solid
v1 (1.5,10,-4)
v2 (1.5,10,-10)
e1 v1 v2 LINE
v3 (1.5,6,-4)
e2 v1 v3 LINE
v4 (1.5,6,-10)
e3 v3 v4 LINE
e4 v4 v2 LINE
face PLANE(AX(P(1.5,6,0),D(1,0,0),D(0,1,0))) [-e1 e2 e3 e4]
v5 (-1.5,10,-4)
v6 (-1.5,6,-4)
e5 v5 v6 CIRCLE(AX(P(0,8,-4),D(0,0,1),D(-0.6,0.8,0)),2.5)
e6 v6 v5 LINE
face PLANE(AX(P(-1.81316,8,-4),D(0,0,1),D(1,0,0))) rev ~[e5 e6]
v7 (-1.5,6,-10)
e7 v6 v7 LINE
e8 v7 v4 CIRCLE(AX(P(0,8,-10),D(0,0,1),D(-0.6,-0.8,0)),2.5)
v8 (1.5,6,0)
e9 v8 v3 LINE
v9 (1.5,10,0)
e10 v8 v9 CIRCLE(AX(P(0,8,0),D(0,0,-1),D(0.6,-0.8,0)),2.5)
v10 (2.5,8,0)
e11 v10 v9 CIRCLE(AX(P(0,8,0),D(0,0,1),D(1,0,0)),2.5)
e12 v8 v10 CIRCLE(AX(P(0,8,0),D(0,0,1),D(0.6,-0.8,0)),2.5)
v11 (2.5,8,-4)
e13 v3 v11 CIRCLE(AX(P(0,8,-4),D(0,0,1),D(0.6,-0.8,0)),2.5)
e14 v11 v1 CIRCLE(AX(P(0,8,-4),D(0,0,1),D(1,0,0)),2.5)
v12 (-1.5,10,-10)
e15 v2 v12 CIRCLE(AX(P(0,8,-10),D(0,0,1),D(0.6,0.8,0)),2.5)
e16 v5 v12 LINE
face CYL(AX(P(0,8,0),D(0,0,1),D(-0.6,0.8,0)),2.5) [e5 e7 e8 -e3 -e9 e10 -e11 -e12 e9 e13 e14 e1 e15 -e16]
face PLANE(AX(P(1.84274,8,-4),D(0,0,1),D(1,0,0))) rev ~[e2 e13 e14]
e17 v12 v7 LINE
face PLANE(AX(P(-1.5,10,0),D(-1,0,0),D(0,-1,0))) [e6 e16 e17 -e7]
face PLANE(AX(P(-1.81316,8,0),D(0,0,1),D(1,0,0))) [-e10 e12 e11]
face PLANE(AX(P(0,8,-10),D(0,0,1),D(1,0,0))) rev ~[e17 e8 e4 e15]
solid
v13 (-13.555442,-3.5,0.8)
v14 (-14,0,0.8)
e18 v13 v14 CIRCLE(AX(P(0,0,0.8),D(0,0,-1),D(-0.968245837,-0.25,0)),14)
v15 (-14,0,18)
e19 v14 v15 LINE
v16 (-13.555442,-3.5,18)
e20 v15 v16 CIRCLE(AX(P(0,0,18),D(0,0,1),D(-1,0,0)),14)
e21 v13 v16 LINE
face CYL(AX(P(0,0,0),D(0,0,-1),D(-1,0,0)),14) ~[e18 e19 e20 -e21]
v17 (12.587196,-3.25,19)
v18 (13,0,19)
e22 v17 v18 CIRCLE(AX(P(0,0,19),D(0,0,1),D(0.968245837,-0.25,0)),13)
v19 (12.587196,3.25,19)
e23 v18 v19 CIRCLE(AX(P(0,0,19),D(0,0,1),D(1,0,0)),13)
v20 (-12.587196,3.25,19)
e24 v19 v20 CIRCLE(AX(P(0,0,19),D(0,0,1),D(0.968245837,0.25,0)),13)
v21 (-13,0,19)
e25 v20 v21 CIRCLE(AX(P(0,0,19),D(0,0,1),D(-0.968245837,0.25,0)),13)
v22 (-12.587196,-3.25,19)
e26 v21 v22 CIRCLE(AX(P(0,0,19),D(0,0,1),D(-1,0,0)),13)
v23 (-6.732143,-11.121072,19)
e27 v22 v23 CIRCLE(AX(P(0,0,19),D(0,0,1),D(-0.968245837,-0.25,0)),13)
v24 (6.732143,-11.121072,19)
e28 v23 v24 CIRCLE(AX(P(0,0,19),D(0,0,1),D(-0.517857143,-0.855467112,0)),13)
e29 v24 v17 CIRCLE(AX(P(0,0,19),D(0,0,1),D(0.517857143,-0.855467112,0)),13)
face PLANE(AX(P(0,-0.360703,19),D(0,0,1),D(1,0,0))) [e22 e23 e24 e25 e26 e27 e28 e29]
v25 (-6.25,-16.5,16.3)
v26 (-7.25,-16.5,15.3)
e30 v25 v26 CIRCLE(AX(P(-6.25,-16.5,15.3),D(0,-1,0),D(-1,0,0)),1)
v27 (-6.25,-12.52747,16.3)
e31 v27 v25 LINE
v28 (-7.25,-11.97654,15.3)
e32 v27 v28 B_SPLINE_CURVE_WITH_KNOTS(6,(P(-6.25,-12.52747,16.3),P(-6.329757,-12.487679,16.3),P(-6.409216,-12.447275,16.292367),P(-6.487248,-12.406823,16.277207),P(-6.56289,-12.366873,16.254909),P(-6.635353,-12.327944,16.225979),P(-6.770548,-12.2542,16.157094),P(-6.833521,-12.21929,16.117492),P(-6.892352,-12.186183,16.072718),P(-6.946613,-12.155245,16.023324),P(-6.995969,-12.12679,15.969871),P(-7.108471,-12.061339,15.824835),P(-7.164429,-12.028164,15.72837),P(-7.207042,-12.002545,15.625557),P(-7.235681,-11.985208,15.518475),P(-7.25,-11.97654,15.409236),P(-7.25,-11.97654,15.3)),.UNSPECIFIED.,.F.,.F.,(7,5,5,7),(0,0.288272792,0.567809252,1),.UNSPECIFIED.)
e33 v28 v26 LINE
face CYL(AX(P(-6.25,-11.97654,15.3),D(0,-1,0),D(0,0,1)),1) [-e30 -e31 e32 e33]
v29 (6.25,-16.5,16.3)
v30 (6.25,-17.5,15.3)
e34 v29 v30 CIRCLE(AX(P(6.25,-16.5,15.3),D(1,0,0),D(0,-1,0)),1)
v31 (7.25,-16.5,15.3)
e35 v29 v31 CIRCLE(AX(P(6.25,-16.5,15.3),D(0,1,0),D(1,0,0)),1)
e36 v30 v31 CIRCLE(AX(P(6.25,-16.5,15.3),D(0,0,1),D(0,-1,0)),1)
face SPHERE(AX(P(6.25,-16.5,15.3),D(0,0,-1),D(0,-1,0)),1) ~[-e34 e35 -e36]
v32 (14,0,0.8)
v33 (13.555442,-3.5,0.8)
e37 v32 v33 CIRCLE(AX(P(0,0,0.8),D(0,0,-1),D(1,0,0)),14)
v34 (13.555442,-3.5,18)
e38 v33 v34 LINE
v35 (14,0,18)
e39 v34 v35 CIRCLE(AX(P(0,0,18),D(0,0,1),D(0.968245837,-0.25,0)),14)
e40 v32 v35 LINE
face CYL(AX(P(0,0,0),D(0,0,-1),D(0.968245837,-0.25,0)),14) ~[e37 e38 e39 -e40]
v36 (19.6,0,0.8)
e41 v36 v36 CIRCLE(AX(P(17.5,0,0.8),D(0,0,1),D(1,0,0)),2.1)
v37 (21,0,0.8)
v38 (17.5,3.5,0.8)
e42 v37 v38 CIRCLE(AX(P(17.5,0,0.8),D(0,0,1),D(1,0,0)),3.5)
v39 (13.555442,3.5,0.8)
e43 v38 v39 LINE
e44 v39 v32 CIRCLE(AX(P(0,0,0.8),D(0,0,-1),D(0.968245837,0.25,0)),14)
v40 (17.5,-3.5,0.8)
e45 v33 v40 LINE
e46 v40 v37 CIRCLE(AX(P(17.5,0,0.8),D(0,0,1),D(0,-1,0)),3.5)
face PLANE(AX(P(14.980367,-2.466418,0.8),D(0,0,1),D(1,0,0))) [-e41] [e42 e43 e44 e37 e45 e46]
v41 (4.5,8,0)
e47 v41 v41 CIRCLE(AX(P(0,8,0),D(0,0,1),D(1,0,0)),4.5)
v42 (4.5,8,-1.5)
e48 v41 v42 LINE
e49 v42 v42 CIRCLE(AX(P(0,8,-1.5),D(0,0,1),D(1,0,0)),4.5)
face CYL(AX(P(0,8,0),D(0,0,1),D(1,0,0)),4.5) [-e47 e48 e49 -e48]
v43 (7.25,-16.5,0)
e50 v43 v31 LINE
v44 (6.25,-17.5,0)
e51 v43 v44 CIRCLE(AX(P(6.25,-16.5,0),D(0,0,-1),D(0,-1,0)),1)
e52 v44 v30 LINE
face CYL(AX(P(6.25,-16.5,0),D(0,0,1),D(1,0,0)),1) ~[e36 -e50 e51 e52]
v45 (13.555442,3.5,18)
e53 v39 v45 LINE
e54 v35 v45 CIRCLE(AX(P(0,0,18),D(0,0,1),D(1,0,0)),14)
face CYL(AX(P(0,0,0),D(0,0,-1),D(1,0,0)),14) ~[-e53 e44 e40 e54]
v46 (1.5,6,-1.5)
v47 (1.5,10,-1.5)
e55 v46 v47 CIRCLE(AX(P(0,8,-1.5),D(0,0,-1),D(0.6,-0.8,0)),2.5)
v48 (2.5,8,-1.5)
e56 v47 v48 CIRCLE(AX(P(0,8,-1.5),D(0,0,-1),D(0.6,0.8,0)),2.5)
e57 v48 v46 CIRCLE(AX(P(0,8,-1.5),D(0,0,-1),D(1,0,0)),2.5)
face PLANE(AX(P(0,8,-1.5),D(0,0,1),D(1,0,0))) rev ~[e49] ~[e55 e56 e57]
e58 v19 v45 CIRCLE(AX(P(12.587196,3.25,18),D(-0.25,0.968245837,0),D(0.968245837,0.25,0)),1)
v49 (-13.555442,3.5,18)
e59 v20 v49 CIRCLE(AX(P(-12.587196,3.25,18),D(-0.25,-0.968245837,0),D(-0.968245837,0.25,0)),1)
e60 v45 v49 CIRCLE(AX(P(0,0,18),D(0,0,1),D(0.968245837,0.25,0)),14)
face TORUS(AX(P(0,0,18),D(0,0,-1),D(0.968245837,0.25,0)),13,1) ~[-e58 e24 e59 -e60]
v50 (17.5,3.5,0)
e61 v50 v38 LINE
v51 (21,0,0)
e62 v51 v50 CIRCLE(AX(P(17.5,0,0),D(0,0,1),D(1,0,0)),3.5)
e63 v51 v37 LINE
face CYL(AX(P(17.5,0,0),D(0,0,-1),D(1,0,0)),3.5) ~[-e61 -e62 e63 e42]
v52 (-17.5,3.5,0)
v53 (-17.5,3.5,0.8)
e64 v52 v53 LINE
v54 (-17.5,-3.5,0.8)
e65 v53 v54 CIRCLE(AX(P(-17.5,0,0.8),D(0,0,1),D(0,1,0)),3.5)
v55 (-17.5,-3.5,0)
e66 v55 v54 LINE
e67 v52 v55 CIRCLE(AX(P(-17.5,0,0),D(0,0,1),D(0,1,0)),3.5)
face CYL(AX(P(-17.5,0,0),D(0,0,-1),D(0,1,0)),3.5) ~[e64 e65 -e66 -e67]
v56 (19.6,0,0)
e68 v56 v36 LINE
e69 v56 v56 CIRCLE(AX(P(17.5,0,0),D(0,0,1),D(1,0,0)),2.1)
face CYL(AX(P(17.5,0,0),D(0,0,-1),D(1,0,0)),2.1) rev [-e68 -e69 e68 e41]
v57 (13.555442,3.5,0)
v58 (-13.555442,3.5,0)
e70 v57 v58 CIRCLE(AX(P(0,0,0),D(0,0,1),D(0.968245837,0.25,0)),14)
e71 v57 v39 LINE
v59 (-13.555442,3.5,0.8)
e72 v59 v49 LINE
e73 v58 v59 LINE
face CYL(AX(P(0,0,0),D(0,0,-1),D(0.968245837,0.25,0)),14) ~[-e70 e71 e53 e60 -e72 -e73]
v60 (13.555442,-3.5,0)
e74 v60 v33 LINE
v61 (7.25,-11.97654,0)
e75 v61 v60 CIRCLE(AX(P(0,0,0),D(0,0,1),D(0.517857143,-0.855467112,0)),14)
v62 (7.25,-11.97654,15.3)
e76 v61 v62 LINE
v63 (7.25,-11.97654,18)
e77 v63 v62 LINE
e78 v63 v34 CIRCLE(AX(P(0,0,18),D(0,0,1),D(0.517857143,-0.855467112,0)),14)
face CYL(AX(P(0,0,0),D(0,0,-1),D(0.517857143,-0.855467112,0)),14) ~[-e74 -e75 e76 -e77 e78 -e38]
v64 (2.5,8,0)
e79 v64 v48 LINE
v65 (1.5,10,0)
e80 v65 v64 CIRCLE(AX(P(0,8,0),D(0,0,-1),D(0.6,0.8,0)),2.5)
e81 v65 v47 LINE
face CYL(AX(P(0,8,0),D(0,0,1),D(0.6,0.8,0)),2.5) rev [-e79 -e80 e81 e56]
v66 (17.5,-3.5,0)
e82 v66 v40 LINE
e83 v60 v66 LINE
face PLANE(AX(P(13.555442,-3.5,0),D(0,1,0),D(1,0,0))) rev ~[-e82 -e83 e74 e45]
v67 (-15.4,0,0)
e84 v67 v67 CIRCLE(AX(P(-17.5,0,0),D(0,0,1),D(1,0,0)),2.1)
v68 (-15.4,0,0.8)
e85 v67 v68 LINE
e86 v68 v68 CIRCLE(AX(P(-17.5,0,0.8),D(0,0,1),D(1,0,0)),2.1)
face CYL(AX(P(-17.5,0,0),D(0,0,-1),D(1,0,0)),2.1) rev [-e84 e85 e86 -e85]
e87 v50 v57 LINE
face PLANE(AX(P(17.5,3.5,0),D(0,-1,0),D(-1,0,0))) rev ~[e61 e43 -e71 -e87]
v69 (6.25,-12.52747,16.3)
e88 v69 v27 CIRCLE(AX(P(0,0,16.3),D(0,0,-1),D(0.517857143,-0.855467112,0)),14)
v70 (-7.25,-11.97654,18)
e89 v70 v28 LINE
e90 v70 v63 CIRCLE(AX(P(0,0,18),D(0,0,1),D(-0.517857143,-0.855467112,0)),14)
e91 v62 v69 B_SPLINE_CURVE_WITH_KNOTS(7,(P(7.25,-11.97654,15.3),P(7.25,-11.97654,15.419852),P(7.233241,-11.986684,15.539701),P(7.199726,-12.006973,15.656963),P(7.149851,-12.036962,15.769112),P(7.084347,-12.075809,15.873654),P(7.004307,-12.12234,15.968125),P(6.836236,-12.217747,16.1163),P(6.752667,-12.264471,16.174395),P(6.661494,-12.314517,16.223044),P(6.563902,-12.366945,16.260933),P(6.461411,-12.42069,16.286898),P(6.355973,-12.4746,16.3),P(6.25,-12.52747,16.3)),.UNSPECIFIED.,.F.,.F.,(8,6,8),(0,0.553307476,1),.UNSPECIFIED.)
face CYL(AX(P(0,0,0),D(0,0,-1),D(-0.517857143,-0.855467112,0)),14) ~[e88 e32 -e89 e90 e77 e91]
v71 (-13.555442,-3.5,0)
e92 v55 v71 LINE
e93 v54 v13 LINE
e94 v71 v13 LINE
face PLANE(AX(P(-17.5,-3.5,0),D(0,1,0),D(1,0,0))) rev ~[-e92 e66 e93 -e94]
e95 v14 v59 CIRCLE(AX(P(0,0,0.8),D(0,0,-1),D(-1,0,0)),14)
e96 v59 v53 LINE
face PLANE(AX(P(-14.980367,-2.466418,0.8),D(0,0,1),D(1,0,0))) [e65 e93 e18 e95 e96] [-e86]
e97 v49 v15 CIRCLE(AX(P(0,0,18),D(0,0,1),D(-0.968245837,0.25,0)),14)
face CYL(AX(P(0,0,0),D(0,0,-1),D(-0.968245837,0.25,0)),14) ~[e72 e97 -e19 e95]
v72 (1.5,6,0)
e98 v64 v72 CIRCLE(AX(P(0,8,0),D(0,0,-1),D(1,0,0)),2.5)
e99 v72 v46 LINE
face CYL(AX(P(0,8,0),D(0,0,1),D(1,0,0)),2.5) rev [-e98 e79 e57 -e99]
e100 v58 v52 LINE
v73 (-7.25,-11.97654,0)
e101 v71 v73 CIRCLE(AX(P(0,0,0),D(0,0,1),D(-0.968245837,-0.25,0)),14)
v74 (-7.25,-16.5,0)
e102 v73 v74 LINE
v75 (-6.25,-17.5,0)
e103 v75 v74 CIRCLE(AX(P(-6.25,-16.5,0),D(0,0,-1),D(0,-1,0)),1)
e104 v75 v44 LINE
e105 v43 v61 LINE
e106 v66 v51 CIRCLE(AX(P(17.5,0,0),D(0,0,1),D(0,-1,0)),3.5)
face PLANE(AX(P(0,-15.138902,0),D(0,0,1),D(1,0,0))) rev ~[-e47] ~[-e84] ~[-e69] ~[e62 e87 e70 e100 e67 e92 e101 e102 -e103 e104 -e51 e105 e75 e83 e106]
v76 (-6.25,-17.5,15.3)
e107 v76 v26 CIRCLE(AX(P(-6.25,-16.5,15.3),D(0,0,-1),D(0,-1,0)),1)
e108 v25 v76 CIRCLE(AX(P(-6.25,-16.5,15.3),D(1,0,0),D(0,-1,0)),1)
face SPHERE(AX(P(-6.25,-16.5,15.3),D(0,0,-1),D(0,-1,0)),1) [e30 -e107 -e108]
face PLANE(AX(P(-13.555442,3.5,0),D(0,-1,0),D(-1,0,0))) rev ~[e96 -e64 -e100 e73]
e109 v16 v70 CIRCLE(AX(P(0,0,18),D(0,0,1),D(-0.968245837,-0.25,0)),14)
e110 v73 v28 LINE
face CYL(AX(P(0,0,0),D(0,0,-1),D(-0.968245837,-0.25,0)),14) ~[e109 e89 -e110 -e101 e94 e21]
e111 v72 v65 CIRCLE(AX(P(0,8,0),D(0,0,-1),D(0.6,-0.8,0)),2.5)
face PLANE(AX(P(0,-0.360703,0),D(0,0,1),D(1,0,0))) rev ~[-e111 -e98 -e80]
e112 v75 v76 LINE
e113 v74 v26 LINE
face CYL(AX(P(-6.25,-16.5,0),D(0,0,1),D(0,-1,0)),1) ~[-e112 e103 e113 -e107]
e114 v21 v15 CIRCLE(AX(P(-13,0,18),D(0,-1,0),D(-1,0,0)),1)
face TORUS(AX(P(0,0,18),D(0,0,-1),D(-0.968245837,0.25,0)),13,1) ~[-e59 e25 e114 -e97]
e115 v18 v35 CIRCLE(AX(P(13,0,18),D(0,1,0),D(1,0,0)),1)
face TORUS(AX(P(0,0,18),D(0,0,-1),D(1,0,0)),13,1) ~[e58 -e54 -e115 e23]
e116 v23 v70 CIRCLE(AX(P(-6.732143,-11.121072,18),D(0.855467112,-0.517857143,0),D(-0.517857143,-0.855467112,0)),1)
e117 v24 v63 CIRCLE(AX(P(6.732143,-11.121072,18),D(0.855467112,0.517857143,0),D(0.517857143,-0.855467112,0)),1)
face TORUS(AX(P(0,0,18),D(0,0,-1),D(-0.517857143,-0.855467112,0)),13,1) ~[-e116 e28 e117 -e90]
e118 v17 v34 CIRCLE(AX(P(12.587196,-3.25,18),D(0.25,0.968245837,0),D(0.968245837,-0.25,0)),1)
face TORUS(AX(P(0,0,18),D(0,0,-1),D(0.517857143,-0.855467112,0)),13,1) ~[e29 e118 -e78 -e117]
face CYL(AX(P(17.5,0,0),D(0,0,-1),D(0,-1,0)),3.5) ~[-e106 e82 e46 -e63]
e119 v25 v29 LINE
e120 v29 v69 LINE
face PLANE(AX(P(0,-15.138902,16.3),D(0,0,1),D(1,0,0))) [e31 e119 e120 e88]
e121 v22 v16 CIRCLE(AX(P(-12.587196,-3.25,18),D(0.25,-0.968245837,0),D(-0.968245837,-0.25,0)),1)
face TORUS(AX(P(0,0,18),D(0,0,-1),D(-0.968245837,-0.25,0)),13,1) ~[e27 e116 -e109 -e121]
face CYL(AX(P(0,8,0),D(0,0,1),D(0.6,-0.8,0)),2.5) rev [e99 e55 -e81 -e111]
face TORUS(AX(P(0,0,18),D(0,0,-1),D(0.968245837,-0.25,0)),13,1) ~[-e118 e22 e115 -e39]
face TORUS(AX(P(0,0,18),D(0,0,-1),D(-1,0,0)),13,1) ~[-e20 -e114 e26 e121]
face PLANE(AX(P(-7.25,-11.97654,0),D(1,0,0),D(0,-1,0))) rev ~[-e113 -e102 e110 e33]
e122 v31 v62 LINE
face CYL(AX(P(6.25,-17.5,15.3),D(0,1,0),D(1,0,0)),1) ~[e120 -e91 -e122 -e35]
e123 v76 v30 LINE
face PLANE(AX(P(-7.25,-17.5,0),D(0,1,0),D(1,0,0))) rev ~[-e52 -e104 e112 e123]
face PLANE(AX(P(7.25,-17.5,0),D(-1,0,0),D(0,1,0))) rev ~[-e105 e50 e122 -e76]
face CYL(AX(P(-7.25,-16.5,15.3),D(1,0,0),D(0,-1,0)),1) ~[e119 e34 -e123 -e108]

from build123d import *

# Parameters (mm, degrees)
F0_R     = 4.5
F1_DEPTH = 19
F2_DEPTH = 10
F3_DEPTH = 1.5
F0_R_2   = 2.1
F4_DEPTH = 0.8
F5_DEPTH = 16.3
F6_R     = 1
F7_DEPTH = 4


with BuildPart() as f1:
    # F0 (on Top) → F1 (new body)
    with BuildSketch(Plane.XY):
        with BuildLine():
            ThreePointArc((13.5554417117, -3.5), (13.8884157477, -1.7640600948), (14, 0))
            ThreePointArc((14, 0), (13.8884157477, 1.7640600948), (13.5554417117, 3.5))
            ThreePointArc((13.5554417117, 3.5), (0, 14), (-13.5554417117, 3.5))
            ThreePointArc((-13.5554417117, 3.5), (-13.8884157477, 1.7640600948), (-14, 0))
            ThreePointArc((-14, 0), (-13.8884157477, -1.7640600948), (-13.5554417117, -3.5))
            ThreePointArc((-13.5554417117, -3.5), (-11.2329663029, -8.3558642903), (-7.25, -11.976539567))
            ThreePointArc((-7.25, -11.976539567), (0, -14), (7.25, -11.976539567))
            ThreePointArc((7.25, -11.976539567), (11.2329663029, -8.3558642903), (13.5554417117, -3.5))
        make_face()
        with Locations((0, 8)):
            Circle(F0_R, mode=Mode.SUBTRACT)
        with Locations((0, 8)):
            Circle(F0_R)
        with BuildLine():
            ThreePointArc((1.5, 10), (2.2360679775, 9.1180339887), (2.5, 8))
            ThreePointArc((2.5, 8), (2.2360679775, 6.8819660113), (1.5, 6))
            ThreePointArc((1.5, 6), (0, 5.5), (-1.5, 6))
            ThreePointArc((-1.5, 6), (-2.5, 8), (-1.5, 10))
            ThreePointArc((-1.5, 10), (0, 10.5), (1.5, 10))
        make_face(mode=Mode.SUBTRACT)
        with BuildLine():
            Line((1.5, 6), (1.5, 10))
            ThreePointArc((1.5, 10), (0, 10.5), (-1.5, 10))
            Line((-1.5, 10), (-1.5, 6))
            ThreePointArc((-1.5, 6), (0, 5.5), (1.5, 6))
        make_face()
        with BuildLine():
            ThreePointArc((1.5, 6), (2.2360679775, 6.8819660113), (2.5, 8))
            ThreePointArc((2.5, 8), (2.2360679775, 9.1180339887), (1.5, 10))
            Line((1.5, 10), (1.5, 6))
        make_face()
        with BuildLine():
            Line((-1.5, 6), (-1.5, 10))
            ThreePointArc((-1.5, 10), (-2.5, 8), (-1.5, 6))
        make_face()
    extrude(amount=F1_DEPTH)

    # F0 (on Top) → F3 (join)
    with BuildSketch(Plane.XY):
        with Locations((0, 8)):
            Circle(F0_R)
        with BuildLine():
            ThreePointArc((1.5, 10), (2.2360679775, 9.1180339887), (2.5, 8))
            ThreePointArc((2.5, 8), (2.2360679775, 6.8819660113), (1.5, 6))
            ThreePointArc((1.5, 6), (0, 5.5), (-1.5, 6))
            ThreePointArc((-1.5, 6), (-2.5, 8), (-1.5, 10))
            ThreePointArc((-1.5, 10), (0, 10.5), (1.5, 10))
        make_face(mode=Mode.SUBTRACT)
    extrude(amount=-F3_DEPTH)

    # F0 (on Top) → F4 (join)
    with BuildSketch(Plane.XY):
        with BuildLine():
            ThreePointArc((17.5, -3.5), (15.0251262658, -2.4748737342), (14, 0))
            ThreePointArc((14, 0), (13.8884157477, -1.7640600948), (13.5554417117, -3.5))
            Line((13.5554417117, -3.5), (17.5, -3.5))
        make_face()
        with BuildLine():
            ThreePointArc((17.5, 3.5), (15.0251262658, 2.4748737342), (14, 0))
            ThreePointArc((14, 0), (15.0251262658, -2.4748737342), (17.5, -3.5))
            ThreePointArc((17.5, -3.5), (19.9748737342, -2.4748737342), (21, 0))
            ThreePointArc((21, 0), (19.9748737342, 2.4748737342), (17.5, 3.5))
        make_face()
        with Locations((17.5, 0)):
            Circle(F0_R_2, mode=Mode.SUBTRACT)
        with BuildLine():
            ThreePointArc((13.5554417117, 3.5), (13.8884157477, 1.7640600948), (14, 0))
            ThreePointArc((14, 0), (15.0251262658, 2.4748737342), (17.5, 3.5))
            Line((17.5, 3.5), (13.5554417117, 3.5))
        make_face()
        with BuildLine():
            ThreePointArc((-13.5554417117, -3.5), (-13.8884157477, -1.7640600948), (-14, 0))
            ThreePointArc((-14, 0), (-15.0251262658, -2.4748737342), (-17.5, -3.5))
            Line((-17.5, -3.5), (-13.5554417117, -3.5))
        make_face()
        with BuildLine():
            ThreePointArc((-17.5, -3.5), (-15.0251262658, -2.4748737342), (-14, 0))
            ThreePointArc((-14, 0), (-15.0251262658, 2.4748737342), (-17.5, 3.5))
            ThreePointArc((-17.5, 3.5), (-21, 0), (-17.5, -3.5))
        make_face()
        with Locations((-17.5, 0)):
            Circle(F0_R_2, mode=Mode.SUBTRACT)
        with BuildLine():
            ThreePointArc((-14, 0), (-13.8884157477, 1.7640600948), (-13.5554417117, 3.5))
            Line((-13.5554417117, 3.5), (-17.5, 3.5))
            ThreePointArc((-17.5, 3.5), (-15.0251262658, 2.4748737342), (-14, 0))
        make_face()
    extrude(amount=F4_DEPTH)

    # F0 (on Top) → F5 (join, through all)
    with BuildSketch(Plane.XY):
        with BuildLine():
            Line((7.25, -17.5), (7.25, -11.976539567))
            ThreePointArc((7.25, -11.976539567), (0, -14), (-7.25, -11.976539567))
            Line((-7.25, -11.976539567), (-7.25, -17.5))
            Line((-7.25, -17.5), (7.25, -17.5))
        make_face()
    extrude(amount=F5_DEPTH)

    # F6
    f6_edges = [f1.edges().sort_by_distance(p)[0] for p in [
        (-13.555442, 3.5, 19),
        (-7.25, -17.5, 8.15),
        (7.25, -17.5, 8.15),
        (0, -17.5, 16.3),
        (-7.25, -14.73827, 16.3),
        (7.25, -14.73827, 16.3),
    ]]
    fillet(f6_edges, radius=F6_R)


with BuildPart() as f2:
    # F0 (on Top) → F2 (new body)
    with BuildSketch(Plane.XY):
        with BuildLine():
            Line((1.5, 6), (1.5, 10))
            ThreePointArc((1.5, 10), (0, 10.5), (-1.5, 10))
            Line((-1.5, 10), (-1.5, 6))
            ThreePointArc((-1.5, 6), (0, 5.5), (1.5, 6))
        make_face()
    extrude(amount=-F2_DEPTH)

    # F0 (on Top) → F7 (join)
    with BuildSketch(Plane.XY):
        with BuildLine():
            Line((-1.5, 6), (-1.5, 10))
            ThreePointArc((-1.5, 10), (-2.5, 8), (-1.5, 6))
        make_face()
        with BuildLine():
            ThreePointArc((1.5, 6), (2.2360679775, 6.8819660113), (2.5, 8))
            ThreePointArc((2.5, 8), (2.2360679775, 9.1180339887), (1.5, 10))
            Line((1.5, 10), (1.5, 6))
        make_face()
    extrude(amount=-F7_DEPTH)


solid = Compound([f1.part, f2.part])
